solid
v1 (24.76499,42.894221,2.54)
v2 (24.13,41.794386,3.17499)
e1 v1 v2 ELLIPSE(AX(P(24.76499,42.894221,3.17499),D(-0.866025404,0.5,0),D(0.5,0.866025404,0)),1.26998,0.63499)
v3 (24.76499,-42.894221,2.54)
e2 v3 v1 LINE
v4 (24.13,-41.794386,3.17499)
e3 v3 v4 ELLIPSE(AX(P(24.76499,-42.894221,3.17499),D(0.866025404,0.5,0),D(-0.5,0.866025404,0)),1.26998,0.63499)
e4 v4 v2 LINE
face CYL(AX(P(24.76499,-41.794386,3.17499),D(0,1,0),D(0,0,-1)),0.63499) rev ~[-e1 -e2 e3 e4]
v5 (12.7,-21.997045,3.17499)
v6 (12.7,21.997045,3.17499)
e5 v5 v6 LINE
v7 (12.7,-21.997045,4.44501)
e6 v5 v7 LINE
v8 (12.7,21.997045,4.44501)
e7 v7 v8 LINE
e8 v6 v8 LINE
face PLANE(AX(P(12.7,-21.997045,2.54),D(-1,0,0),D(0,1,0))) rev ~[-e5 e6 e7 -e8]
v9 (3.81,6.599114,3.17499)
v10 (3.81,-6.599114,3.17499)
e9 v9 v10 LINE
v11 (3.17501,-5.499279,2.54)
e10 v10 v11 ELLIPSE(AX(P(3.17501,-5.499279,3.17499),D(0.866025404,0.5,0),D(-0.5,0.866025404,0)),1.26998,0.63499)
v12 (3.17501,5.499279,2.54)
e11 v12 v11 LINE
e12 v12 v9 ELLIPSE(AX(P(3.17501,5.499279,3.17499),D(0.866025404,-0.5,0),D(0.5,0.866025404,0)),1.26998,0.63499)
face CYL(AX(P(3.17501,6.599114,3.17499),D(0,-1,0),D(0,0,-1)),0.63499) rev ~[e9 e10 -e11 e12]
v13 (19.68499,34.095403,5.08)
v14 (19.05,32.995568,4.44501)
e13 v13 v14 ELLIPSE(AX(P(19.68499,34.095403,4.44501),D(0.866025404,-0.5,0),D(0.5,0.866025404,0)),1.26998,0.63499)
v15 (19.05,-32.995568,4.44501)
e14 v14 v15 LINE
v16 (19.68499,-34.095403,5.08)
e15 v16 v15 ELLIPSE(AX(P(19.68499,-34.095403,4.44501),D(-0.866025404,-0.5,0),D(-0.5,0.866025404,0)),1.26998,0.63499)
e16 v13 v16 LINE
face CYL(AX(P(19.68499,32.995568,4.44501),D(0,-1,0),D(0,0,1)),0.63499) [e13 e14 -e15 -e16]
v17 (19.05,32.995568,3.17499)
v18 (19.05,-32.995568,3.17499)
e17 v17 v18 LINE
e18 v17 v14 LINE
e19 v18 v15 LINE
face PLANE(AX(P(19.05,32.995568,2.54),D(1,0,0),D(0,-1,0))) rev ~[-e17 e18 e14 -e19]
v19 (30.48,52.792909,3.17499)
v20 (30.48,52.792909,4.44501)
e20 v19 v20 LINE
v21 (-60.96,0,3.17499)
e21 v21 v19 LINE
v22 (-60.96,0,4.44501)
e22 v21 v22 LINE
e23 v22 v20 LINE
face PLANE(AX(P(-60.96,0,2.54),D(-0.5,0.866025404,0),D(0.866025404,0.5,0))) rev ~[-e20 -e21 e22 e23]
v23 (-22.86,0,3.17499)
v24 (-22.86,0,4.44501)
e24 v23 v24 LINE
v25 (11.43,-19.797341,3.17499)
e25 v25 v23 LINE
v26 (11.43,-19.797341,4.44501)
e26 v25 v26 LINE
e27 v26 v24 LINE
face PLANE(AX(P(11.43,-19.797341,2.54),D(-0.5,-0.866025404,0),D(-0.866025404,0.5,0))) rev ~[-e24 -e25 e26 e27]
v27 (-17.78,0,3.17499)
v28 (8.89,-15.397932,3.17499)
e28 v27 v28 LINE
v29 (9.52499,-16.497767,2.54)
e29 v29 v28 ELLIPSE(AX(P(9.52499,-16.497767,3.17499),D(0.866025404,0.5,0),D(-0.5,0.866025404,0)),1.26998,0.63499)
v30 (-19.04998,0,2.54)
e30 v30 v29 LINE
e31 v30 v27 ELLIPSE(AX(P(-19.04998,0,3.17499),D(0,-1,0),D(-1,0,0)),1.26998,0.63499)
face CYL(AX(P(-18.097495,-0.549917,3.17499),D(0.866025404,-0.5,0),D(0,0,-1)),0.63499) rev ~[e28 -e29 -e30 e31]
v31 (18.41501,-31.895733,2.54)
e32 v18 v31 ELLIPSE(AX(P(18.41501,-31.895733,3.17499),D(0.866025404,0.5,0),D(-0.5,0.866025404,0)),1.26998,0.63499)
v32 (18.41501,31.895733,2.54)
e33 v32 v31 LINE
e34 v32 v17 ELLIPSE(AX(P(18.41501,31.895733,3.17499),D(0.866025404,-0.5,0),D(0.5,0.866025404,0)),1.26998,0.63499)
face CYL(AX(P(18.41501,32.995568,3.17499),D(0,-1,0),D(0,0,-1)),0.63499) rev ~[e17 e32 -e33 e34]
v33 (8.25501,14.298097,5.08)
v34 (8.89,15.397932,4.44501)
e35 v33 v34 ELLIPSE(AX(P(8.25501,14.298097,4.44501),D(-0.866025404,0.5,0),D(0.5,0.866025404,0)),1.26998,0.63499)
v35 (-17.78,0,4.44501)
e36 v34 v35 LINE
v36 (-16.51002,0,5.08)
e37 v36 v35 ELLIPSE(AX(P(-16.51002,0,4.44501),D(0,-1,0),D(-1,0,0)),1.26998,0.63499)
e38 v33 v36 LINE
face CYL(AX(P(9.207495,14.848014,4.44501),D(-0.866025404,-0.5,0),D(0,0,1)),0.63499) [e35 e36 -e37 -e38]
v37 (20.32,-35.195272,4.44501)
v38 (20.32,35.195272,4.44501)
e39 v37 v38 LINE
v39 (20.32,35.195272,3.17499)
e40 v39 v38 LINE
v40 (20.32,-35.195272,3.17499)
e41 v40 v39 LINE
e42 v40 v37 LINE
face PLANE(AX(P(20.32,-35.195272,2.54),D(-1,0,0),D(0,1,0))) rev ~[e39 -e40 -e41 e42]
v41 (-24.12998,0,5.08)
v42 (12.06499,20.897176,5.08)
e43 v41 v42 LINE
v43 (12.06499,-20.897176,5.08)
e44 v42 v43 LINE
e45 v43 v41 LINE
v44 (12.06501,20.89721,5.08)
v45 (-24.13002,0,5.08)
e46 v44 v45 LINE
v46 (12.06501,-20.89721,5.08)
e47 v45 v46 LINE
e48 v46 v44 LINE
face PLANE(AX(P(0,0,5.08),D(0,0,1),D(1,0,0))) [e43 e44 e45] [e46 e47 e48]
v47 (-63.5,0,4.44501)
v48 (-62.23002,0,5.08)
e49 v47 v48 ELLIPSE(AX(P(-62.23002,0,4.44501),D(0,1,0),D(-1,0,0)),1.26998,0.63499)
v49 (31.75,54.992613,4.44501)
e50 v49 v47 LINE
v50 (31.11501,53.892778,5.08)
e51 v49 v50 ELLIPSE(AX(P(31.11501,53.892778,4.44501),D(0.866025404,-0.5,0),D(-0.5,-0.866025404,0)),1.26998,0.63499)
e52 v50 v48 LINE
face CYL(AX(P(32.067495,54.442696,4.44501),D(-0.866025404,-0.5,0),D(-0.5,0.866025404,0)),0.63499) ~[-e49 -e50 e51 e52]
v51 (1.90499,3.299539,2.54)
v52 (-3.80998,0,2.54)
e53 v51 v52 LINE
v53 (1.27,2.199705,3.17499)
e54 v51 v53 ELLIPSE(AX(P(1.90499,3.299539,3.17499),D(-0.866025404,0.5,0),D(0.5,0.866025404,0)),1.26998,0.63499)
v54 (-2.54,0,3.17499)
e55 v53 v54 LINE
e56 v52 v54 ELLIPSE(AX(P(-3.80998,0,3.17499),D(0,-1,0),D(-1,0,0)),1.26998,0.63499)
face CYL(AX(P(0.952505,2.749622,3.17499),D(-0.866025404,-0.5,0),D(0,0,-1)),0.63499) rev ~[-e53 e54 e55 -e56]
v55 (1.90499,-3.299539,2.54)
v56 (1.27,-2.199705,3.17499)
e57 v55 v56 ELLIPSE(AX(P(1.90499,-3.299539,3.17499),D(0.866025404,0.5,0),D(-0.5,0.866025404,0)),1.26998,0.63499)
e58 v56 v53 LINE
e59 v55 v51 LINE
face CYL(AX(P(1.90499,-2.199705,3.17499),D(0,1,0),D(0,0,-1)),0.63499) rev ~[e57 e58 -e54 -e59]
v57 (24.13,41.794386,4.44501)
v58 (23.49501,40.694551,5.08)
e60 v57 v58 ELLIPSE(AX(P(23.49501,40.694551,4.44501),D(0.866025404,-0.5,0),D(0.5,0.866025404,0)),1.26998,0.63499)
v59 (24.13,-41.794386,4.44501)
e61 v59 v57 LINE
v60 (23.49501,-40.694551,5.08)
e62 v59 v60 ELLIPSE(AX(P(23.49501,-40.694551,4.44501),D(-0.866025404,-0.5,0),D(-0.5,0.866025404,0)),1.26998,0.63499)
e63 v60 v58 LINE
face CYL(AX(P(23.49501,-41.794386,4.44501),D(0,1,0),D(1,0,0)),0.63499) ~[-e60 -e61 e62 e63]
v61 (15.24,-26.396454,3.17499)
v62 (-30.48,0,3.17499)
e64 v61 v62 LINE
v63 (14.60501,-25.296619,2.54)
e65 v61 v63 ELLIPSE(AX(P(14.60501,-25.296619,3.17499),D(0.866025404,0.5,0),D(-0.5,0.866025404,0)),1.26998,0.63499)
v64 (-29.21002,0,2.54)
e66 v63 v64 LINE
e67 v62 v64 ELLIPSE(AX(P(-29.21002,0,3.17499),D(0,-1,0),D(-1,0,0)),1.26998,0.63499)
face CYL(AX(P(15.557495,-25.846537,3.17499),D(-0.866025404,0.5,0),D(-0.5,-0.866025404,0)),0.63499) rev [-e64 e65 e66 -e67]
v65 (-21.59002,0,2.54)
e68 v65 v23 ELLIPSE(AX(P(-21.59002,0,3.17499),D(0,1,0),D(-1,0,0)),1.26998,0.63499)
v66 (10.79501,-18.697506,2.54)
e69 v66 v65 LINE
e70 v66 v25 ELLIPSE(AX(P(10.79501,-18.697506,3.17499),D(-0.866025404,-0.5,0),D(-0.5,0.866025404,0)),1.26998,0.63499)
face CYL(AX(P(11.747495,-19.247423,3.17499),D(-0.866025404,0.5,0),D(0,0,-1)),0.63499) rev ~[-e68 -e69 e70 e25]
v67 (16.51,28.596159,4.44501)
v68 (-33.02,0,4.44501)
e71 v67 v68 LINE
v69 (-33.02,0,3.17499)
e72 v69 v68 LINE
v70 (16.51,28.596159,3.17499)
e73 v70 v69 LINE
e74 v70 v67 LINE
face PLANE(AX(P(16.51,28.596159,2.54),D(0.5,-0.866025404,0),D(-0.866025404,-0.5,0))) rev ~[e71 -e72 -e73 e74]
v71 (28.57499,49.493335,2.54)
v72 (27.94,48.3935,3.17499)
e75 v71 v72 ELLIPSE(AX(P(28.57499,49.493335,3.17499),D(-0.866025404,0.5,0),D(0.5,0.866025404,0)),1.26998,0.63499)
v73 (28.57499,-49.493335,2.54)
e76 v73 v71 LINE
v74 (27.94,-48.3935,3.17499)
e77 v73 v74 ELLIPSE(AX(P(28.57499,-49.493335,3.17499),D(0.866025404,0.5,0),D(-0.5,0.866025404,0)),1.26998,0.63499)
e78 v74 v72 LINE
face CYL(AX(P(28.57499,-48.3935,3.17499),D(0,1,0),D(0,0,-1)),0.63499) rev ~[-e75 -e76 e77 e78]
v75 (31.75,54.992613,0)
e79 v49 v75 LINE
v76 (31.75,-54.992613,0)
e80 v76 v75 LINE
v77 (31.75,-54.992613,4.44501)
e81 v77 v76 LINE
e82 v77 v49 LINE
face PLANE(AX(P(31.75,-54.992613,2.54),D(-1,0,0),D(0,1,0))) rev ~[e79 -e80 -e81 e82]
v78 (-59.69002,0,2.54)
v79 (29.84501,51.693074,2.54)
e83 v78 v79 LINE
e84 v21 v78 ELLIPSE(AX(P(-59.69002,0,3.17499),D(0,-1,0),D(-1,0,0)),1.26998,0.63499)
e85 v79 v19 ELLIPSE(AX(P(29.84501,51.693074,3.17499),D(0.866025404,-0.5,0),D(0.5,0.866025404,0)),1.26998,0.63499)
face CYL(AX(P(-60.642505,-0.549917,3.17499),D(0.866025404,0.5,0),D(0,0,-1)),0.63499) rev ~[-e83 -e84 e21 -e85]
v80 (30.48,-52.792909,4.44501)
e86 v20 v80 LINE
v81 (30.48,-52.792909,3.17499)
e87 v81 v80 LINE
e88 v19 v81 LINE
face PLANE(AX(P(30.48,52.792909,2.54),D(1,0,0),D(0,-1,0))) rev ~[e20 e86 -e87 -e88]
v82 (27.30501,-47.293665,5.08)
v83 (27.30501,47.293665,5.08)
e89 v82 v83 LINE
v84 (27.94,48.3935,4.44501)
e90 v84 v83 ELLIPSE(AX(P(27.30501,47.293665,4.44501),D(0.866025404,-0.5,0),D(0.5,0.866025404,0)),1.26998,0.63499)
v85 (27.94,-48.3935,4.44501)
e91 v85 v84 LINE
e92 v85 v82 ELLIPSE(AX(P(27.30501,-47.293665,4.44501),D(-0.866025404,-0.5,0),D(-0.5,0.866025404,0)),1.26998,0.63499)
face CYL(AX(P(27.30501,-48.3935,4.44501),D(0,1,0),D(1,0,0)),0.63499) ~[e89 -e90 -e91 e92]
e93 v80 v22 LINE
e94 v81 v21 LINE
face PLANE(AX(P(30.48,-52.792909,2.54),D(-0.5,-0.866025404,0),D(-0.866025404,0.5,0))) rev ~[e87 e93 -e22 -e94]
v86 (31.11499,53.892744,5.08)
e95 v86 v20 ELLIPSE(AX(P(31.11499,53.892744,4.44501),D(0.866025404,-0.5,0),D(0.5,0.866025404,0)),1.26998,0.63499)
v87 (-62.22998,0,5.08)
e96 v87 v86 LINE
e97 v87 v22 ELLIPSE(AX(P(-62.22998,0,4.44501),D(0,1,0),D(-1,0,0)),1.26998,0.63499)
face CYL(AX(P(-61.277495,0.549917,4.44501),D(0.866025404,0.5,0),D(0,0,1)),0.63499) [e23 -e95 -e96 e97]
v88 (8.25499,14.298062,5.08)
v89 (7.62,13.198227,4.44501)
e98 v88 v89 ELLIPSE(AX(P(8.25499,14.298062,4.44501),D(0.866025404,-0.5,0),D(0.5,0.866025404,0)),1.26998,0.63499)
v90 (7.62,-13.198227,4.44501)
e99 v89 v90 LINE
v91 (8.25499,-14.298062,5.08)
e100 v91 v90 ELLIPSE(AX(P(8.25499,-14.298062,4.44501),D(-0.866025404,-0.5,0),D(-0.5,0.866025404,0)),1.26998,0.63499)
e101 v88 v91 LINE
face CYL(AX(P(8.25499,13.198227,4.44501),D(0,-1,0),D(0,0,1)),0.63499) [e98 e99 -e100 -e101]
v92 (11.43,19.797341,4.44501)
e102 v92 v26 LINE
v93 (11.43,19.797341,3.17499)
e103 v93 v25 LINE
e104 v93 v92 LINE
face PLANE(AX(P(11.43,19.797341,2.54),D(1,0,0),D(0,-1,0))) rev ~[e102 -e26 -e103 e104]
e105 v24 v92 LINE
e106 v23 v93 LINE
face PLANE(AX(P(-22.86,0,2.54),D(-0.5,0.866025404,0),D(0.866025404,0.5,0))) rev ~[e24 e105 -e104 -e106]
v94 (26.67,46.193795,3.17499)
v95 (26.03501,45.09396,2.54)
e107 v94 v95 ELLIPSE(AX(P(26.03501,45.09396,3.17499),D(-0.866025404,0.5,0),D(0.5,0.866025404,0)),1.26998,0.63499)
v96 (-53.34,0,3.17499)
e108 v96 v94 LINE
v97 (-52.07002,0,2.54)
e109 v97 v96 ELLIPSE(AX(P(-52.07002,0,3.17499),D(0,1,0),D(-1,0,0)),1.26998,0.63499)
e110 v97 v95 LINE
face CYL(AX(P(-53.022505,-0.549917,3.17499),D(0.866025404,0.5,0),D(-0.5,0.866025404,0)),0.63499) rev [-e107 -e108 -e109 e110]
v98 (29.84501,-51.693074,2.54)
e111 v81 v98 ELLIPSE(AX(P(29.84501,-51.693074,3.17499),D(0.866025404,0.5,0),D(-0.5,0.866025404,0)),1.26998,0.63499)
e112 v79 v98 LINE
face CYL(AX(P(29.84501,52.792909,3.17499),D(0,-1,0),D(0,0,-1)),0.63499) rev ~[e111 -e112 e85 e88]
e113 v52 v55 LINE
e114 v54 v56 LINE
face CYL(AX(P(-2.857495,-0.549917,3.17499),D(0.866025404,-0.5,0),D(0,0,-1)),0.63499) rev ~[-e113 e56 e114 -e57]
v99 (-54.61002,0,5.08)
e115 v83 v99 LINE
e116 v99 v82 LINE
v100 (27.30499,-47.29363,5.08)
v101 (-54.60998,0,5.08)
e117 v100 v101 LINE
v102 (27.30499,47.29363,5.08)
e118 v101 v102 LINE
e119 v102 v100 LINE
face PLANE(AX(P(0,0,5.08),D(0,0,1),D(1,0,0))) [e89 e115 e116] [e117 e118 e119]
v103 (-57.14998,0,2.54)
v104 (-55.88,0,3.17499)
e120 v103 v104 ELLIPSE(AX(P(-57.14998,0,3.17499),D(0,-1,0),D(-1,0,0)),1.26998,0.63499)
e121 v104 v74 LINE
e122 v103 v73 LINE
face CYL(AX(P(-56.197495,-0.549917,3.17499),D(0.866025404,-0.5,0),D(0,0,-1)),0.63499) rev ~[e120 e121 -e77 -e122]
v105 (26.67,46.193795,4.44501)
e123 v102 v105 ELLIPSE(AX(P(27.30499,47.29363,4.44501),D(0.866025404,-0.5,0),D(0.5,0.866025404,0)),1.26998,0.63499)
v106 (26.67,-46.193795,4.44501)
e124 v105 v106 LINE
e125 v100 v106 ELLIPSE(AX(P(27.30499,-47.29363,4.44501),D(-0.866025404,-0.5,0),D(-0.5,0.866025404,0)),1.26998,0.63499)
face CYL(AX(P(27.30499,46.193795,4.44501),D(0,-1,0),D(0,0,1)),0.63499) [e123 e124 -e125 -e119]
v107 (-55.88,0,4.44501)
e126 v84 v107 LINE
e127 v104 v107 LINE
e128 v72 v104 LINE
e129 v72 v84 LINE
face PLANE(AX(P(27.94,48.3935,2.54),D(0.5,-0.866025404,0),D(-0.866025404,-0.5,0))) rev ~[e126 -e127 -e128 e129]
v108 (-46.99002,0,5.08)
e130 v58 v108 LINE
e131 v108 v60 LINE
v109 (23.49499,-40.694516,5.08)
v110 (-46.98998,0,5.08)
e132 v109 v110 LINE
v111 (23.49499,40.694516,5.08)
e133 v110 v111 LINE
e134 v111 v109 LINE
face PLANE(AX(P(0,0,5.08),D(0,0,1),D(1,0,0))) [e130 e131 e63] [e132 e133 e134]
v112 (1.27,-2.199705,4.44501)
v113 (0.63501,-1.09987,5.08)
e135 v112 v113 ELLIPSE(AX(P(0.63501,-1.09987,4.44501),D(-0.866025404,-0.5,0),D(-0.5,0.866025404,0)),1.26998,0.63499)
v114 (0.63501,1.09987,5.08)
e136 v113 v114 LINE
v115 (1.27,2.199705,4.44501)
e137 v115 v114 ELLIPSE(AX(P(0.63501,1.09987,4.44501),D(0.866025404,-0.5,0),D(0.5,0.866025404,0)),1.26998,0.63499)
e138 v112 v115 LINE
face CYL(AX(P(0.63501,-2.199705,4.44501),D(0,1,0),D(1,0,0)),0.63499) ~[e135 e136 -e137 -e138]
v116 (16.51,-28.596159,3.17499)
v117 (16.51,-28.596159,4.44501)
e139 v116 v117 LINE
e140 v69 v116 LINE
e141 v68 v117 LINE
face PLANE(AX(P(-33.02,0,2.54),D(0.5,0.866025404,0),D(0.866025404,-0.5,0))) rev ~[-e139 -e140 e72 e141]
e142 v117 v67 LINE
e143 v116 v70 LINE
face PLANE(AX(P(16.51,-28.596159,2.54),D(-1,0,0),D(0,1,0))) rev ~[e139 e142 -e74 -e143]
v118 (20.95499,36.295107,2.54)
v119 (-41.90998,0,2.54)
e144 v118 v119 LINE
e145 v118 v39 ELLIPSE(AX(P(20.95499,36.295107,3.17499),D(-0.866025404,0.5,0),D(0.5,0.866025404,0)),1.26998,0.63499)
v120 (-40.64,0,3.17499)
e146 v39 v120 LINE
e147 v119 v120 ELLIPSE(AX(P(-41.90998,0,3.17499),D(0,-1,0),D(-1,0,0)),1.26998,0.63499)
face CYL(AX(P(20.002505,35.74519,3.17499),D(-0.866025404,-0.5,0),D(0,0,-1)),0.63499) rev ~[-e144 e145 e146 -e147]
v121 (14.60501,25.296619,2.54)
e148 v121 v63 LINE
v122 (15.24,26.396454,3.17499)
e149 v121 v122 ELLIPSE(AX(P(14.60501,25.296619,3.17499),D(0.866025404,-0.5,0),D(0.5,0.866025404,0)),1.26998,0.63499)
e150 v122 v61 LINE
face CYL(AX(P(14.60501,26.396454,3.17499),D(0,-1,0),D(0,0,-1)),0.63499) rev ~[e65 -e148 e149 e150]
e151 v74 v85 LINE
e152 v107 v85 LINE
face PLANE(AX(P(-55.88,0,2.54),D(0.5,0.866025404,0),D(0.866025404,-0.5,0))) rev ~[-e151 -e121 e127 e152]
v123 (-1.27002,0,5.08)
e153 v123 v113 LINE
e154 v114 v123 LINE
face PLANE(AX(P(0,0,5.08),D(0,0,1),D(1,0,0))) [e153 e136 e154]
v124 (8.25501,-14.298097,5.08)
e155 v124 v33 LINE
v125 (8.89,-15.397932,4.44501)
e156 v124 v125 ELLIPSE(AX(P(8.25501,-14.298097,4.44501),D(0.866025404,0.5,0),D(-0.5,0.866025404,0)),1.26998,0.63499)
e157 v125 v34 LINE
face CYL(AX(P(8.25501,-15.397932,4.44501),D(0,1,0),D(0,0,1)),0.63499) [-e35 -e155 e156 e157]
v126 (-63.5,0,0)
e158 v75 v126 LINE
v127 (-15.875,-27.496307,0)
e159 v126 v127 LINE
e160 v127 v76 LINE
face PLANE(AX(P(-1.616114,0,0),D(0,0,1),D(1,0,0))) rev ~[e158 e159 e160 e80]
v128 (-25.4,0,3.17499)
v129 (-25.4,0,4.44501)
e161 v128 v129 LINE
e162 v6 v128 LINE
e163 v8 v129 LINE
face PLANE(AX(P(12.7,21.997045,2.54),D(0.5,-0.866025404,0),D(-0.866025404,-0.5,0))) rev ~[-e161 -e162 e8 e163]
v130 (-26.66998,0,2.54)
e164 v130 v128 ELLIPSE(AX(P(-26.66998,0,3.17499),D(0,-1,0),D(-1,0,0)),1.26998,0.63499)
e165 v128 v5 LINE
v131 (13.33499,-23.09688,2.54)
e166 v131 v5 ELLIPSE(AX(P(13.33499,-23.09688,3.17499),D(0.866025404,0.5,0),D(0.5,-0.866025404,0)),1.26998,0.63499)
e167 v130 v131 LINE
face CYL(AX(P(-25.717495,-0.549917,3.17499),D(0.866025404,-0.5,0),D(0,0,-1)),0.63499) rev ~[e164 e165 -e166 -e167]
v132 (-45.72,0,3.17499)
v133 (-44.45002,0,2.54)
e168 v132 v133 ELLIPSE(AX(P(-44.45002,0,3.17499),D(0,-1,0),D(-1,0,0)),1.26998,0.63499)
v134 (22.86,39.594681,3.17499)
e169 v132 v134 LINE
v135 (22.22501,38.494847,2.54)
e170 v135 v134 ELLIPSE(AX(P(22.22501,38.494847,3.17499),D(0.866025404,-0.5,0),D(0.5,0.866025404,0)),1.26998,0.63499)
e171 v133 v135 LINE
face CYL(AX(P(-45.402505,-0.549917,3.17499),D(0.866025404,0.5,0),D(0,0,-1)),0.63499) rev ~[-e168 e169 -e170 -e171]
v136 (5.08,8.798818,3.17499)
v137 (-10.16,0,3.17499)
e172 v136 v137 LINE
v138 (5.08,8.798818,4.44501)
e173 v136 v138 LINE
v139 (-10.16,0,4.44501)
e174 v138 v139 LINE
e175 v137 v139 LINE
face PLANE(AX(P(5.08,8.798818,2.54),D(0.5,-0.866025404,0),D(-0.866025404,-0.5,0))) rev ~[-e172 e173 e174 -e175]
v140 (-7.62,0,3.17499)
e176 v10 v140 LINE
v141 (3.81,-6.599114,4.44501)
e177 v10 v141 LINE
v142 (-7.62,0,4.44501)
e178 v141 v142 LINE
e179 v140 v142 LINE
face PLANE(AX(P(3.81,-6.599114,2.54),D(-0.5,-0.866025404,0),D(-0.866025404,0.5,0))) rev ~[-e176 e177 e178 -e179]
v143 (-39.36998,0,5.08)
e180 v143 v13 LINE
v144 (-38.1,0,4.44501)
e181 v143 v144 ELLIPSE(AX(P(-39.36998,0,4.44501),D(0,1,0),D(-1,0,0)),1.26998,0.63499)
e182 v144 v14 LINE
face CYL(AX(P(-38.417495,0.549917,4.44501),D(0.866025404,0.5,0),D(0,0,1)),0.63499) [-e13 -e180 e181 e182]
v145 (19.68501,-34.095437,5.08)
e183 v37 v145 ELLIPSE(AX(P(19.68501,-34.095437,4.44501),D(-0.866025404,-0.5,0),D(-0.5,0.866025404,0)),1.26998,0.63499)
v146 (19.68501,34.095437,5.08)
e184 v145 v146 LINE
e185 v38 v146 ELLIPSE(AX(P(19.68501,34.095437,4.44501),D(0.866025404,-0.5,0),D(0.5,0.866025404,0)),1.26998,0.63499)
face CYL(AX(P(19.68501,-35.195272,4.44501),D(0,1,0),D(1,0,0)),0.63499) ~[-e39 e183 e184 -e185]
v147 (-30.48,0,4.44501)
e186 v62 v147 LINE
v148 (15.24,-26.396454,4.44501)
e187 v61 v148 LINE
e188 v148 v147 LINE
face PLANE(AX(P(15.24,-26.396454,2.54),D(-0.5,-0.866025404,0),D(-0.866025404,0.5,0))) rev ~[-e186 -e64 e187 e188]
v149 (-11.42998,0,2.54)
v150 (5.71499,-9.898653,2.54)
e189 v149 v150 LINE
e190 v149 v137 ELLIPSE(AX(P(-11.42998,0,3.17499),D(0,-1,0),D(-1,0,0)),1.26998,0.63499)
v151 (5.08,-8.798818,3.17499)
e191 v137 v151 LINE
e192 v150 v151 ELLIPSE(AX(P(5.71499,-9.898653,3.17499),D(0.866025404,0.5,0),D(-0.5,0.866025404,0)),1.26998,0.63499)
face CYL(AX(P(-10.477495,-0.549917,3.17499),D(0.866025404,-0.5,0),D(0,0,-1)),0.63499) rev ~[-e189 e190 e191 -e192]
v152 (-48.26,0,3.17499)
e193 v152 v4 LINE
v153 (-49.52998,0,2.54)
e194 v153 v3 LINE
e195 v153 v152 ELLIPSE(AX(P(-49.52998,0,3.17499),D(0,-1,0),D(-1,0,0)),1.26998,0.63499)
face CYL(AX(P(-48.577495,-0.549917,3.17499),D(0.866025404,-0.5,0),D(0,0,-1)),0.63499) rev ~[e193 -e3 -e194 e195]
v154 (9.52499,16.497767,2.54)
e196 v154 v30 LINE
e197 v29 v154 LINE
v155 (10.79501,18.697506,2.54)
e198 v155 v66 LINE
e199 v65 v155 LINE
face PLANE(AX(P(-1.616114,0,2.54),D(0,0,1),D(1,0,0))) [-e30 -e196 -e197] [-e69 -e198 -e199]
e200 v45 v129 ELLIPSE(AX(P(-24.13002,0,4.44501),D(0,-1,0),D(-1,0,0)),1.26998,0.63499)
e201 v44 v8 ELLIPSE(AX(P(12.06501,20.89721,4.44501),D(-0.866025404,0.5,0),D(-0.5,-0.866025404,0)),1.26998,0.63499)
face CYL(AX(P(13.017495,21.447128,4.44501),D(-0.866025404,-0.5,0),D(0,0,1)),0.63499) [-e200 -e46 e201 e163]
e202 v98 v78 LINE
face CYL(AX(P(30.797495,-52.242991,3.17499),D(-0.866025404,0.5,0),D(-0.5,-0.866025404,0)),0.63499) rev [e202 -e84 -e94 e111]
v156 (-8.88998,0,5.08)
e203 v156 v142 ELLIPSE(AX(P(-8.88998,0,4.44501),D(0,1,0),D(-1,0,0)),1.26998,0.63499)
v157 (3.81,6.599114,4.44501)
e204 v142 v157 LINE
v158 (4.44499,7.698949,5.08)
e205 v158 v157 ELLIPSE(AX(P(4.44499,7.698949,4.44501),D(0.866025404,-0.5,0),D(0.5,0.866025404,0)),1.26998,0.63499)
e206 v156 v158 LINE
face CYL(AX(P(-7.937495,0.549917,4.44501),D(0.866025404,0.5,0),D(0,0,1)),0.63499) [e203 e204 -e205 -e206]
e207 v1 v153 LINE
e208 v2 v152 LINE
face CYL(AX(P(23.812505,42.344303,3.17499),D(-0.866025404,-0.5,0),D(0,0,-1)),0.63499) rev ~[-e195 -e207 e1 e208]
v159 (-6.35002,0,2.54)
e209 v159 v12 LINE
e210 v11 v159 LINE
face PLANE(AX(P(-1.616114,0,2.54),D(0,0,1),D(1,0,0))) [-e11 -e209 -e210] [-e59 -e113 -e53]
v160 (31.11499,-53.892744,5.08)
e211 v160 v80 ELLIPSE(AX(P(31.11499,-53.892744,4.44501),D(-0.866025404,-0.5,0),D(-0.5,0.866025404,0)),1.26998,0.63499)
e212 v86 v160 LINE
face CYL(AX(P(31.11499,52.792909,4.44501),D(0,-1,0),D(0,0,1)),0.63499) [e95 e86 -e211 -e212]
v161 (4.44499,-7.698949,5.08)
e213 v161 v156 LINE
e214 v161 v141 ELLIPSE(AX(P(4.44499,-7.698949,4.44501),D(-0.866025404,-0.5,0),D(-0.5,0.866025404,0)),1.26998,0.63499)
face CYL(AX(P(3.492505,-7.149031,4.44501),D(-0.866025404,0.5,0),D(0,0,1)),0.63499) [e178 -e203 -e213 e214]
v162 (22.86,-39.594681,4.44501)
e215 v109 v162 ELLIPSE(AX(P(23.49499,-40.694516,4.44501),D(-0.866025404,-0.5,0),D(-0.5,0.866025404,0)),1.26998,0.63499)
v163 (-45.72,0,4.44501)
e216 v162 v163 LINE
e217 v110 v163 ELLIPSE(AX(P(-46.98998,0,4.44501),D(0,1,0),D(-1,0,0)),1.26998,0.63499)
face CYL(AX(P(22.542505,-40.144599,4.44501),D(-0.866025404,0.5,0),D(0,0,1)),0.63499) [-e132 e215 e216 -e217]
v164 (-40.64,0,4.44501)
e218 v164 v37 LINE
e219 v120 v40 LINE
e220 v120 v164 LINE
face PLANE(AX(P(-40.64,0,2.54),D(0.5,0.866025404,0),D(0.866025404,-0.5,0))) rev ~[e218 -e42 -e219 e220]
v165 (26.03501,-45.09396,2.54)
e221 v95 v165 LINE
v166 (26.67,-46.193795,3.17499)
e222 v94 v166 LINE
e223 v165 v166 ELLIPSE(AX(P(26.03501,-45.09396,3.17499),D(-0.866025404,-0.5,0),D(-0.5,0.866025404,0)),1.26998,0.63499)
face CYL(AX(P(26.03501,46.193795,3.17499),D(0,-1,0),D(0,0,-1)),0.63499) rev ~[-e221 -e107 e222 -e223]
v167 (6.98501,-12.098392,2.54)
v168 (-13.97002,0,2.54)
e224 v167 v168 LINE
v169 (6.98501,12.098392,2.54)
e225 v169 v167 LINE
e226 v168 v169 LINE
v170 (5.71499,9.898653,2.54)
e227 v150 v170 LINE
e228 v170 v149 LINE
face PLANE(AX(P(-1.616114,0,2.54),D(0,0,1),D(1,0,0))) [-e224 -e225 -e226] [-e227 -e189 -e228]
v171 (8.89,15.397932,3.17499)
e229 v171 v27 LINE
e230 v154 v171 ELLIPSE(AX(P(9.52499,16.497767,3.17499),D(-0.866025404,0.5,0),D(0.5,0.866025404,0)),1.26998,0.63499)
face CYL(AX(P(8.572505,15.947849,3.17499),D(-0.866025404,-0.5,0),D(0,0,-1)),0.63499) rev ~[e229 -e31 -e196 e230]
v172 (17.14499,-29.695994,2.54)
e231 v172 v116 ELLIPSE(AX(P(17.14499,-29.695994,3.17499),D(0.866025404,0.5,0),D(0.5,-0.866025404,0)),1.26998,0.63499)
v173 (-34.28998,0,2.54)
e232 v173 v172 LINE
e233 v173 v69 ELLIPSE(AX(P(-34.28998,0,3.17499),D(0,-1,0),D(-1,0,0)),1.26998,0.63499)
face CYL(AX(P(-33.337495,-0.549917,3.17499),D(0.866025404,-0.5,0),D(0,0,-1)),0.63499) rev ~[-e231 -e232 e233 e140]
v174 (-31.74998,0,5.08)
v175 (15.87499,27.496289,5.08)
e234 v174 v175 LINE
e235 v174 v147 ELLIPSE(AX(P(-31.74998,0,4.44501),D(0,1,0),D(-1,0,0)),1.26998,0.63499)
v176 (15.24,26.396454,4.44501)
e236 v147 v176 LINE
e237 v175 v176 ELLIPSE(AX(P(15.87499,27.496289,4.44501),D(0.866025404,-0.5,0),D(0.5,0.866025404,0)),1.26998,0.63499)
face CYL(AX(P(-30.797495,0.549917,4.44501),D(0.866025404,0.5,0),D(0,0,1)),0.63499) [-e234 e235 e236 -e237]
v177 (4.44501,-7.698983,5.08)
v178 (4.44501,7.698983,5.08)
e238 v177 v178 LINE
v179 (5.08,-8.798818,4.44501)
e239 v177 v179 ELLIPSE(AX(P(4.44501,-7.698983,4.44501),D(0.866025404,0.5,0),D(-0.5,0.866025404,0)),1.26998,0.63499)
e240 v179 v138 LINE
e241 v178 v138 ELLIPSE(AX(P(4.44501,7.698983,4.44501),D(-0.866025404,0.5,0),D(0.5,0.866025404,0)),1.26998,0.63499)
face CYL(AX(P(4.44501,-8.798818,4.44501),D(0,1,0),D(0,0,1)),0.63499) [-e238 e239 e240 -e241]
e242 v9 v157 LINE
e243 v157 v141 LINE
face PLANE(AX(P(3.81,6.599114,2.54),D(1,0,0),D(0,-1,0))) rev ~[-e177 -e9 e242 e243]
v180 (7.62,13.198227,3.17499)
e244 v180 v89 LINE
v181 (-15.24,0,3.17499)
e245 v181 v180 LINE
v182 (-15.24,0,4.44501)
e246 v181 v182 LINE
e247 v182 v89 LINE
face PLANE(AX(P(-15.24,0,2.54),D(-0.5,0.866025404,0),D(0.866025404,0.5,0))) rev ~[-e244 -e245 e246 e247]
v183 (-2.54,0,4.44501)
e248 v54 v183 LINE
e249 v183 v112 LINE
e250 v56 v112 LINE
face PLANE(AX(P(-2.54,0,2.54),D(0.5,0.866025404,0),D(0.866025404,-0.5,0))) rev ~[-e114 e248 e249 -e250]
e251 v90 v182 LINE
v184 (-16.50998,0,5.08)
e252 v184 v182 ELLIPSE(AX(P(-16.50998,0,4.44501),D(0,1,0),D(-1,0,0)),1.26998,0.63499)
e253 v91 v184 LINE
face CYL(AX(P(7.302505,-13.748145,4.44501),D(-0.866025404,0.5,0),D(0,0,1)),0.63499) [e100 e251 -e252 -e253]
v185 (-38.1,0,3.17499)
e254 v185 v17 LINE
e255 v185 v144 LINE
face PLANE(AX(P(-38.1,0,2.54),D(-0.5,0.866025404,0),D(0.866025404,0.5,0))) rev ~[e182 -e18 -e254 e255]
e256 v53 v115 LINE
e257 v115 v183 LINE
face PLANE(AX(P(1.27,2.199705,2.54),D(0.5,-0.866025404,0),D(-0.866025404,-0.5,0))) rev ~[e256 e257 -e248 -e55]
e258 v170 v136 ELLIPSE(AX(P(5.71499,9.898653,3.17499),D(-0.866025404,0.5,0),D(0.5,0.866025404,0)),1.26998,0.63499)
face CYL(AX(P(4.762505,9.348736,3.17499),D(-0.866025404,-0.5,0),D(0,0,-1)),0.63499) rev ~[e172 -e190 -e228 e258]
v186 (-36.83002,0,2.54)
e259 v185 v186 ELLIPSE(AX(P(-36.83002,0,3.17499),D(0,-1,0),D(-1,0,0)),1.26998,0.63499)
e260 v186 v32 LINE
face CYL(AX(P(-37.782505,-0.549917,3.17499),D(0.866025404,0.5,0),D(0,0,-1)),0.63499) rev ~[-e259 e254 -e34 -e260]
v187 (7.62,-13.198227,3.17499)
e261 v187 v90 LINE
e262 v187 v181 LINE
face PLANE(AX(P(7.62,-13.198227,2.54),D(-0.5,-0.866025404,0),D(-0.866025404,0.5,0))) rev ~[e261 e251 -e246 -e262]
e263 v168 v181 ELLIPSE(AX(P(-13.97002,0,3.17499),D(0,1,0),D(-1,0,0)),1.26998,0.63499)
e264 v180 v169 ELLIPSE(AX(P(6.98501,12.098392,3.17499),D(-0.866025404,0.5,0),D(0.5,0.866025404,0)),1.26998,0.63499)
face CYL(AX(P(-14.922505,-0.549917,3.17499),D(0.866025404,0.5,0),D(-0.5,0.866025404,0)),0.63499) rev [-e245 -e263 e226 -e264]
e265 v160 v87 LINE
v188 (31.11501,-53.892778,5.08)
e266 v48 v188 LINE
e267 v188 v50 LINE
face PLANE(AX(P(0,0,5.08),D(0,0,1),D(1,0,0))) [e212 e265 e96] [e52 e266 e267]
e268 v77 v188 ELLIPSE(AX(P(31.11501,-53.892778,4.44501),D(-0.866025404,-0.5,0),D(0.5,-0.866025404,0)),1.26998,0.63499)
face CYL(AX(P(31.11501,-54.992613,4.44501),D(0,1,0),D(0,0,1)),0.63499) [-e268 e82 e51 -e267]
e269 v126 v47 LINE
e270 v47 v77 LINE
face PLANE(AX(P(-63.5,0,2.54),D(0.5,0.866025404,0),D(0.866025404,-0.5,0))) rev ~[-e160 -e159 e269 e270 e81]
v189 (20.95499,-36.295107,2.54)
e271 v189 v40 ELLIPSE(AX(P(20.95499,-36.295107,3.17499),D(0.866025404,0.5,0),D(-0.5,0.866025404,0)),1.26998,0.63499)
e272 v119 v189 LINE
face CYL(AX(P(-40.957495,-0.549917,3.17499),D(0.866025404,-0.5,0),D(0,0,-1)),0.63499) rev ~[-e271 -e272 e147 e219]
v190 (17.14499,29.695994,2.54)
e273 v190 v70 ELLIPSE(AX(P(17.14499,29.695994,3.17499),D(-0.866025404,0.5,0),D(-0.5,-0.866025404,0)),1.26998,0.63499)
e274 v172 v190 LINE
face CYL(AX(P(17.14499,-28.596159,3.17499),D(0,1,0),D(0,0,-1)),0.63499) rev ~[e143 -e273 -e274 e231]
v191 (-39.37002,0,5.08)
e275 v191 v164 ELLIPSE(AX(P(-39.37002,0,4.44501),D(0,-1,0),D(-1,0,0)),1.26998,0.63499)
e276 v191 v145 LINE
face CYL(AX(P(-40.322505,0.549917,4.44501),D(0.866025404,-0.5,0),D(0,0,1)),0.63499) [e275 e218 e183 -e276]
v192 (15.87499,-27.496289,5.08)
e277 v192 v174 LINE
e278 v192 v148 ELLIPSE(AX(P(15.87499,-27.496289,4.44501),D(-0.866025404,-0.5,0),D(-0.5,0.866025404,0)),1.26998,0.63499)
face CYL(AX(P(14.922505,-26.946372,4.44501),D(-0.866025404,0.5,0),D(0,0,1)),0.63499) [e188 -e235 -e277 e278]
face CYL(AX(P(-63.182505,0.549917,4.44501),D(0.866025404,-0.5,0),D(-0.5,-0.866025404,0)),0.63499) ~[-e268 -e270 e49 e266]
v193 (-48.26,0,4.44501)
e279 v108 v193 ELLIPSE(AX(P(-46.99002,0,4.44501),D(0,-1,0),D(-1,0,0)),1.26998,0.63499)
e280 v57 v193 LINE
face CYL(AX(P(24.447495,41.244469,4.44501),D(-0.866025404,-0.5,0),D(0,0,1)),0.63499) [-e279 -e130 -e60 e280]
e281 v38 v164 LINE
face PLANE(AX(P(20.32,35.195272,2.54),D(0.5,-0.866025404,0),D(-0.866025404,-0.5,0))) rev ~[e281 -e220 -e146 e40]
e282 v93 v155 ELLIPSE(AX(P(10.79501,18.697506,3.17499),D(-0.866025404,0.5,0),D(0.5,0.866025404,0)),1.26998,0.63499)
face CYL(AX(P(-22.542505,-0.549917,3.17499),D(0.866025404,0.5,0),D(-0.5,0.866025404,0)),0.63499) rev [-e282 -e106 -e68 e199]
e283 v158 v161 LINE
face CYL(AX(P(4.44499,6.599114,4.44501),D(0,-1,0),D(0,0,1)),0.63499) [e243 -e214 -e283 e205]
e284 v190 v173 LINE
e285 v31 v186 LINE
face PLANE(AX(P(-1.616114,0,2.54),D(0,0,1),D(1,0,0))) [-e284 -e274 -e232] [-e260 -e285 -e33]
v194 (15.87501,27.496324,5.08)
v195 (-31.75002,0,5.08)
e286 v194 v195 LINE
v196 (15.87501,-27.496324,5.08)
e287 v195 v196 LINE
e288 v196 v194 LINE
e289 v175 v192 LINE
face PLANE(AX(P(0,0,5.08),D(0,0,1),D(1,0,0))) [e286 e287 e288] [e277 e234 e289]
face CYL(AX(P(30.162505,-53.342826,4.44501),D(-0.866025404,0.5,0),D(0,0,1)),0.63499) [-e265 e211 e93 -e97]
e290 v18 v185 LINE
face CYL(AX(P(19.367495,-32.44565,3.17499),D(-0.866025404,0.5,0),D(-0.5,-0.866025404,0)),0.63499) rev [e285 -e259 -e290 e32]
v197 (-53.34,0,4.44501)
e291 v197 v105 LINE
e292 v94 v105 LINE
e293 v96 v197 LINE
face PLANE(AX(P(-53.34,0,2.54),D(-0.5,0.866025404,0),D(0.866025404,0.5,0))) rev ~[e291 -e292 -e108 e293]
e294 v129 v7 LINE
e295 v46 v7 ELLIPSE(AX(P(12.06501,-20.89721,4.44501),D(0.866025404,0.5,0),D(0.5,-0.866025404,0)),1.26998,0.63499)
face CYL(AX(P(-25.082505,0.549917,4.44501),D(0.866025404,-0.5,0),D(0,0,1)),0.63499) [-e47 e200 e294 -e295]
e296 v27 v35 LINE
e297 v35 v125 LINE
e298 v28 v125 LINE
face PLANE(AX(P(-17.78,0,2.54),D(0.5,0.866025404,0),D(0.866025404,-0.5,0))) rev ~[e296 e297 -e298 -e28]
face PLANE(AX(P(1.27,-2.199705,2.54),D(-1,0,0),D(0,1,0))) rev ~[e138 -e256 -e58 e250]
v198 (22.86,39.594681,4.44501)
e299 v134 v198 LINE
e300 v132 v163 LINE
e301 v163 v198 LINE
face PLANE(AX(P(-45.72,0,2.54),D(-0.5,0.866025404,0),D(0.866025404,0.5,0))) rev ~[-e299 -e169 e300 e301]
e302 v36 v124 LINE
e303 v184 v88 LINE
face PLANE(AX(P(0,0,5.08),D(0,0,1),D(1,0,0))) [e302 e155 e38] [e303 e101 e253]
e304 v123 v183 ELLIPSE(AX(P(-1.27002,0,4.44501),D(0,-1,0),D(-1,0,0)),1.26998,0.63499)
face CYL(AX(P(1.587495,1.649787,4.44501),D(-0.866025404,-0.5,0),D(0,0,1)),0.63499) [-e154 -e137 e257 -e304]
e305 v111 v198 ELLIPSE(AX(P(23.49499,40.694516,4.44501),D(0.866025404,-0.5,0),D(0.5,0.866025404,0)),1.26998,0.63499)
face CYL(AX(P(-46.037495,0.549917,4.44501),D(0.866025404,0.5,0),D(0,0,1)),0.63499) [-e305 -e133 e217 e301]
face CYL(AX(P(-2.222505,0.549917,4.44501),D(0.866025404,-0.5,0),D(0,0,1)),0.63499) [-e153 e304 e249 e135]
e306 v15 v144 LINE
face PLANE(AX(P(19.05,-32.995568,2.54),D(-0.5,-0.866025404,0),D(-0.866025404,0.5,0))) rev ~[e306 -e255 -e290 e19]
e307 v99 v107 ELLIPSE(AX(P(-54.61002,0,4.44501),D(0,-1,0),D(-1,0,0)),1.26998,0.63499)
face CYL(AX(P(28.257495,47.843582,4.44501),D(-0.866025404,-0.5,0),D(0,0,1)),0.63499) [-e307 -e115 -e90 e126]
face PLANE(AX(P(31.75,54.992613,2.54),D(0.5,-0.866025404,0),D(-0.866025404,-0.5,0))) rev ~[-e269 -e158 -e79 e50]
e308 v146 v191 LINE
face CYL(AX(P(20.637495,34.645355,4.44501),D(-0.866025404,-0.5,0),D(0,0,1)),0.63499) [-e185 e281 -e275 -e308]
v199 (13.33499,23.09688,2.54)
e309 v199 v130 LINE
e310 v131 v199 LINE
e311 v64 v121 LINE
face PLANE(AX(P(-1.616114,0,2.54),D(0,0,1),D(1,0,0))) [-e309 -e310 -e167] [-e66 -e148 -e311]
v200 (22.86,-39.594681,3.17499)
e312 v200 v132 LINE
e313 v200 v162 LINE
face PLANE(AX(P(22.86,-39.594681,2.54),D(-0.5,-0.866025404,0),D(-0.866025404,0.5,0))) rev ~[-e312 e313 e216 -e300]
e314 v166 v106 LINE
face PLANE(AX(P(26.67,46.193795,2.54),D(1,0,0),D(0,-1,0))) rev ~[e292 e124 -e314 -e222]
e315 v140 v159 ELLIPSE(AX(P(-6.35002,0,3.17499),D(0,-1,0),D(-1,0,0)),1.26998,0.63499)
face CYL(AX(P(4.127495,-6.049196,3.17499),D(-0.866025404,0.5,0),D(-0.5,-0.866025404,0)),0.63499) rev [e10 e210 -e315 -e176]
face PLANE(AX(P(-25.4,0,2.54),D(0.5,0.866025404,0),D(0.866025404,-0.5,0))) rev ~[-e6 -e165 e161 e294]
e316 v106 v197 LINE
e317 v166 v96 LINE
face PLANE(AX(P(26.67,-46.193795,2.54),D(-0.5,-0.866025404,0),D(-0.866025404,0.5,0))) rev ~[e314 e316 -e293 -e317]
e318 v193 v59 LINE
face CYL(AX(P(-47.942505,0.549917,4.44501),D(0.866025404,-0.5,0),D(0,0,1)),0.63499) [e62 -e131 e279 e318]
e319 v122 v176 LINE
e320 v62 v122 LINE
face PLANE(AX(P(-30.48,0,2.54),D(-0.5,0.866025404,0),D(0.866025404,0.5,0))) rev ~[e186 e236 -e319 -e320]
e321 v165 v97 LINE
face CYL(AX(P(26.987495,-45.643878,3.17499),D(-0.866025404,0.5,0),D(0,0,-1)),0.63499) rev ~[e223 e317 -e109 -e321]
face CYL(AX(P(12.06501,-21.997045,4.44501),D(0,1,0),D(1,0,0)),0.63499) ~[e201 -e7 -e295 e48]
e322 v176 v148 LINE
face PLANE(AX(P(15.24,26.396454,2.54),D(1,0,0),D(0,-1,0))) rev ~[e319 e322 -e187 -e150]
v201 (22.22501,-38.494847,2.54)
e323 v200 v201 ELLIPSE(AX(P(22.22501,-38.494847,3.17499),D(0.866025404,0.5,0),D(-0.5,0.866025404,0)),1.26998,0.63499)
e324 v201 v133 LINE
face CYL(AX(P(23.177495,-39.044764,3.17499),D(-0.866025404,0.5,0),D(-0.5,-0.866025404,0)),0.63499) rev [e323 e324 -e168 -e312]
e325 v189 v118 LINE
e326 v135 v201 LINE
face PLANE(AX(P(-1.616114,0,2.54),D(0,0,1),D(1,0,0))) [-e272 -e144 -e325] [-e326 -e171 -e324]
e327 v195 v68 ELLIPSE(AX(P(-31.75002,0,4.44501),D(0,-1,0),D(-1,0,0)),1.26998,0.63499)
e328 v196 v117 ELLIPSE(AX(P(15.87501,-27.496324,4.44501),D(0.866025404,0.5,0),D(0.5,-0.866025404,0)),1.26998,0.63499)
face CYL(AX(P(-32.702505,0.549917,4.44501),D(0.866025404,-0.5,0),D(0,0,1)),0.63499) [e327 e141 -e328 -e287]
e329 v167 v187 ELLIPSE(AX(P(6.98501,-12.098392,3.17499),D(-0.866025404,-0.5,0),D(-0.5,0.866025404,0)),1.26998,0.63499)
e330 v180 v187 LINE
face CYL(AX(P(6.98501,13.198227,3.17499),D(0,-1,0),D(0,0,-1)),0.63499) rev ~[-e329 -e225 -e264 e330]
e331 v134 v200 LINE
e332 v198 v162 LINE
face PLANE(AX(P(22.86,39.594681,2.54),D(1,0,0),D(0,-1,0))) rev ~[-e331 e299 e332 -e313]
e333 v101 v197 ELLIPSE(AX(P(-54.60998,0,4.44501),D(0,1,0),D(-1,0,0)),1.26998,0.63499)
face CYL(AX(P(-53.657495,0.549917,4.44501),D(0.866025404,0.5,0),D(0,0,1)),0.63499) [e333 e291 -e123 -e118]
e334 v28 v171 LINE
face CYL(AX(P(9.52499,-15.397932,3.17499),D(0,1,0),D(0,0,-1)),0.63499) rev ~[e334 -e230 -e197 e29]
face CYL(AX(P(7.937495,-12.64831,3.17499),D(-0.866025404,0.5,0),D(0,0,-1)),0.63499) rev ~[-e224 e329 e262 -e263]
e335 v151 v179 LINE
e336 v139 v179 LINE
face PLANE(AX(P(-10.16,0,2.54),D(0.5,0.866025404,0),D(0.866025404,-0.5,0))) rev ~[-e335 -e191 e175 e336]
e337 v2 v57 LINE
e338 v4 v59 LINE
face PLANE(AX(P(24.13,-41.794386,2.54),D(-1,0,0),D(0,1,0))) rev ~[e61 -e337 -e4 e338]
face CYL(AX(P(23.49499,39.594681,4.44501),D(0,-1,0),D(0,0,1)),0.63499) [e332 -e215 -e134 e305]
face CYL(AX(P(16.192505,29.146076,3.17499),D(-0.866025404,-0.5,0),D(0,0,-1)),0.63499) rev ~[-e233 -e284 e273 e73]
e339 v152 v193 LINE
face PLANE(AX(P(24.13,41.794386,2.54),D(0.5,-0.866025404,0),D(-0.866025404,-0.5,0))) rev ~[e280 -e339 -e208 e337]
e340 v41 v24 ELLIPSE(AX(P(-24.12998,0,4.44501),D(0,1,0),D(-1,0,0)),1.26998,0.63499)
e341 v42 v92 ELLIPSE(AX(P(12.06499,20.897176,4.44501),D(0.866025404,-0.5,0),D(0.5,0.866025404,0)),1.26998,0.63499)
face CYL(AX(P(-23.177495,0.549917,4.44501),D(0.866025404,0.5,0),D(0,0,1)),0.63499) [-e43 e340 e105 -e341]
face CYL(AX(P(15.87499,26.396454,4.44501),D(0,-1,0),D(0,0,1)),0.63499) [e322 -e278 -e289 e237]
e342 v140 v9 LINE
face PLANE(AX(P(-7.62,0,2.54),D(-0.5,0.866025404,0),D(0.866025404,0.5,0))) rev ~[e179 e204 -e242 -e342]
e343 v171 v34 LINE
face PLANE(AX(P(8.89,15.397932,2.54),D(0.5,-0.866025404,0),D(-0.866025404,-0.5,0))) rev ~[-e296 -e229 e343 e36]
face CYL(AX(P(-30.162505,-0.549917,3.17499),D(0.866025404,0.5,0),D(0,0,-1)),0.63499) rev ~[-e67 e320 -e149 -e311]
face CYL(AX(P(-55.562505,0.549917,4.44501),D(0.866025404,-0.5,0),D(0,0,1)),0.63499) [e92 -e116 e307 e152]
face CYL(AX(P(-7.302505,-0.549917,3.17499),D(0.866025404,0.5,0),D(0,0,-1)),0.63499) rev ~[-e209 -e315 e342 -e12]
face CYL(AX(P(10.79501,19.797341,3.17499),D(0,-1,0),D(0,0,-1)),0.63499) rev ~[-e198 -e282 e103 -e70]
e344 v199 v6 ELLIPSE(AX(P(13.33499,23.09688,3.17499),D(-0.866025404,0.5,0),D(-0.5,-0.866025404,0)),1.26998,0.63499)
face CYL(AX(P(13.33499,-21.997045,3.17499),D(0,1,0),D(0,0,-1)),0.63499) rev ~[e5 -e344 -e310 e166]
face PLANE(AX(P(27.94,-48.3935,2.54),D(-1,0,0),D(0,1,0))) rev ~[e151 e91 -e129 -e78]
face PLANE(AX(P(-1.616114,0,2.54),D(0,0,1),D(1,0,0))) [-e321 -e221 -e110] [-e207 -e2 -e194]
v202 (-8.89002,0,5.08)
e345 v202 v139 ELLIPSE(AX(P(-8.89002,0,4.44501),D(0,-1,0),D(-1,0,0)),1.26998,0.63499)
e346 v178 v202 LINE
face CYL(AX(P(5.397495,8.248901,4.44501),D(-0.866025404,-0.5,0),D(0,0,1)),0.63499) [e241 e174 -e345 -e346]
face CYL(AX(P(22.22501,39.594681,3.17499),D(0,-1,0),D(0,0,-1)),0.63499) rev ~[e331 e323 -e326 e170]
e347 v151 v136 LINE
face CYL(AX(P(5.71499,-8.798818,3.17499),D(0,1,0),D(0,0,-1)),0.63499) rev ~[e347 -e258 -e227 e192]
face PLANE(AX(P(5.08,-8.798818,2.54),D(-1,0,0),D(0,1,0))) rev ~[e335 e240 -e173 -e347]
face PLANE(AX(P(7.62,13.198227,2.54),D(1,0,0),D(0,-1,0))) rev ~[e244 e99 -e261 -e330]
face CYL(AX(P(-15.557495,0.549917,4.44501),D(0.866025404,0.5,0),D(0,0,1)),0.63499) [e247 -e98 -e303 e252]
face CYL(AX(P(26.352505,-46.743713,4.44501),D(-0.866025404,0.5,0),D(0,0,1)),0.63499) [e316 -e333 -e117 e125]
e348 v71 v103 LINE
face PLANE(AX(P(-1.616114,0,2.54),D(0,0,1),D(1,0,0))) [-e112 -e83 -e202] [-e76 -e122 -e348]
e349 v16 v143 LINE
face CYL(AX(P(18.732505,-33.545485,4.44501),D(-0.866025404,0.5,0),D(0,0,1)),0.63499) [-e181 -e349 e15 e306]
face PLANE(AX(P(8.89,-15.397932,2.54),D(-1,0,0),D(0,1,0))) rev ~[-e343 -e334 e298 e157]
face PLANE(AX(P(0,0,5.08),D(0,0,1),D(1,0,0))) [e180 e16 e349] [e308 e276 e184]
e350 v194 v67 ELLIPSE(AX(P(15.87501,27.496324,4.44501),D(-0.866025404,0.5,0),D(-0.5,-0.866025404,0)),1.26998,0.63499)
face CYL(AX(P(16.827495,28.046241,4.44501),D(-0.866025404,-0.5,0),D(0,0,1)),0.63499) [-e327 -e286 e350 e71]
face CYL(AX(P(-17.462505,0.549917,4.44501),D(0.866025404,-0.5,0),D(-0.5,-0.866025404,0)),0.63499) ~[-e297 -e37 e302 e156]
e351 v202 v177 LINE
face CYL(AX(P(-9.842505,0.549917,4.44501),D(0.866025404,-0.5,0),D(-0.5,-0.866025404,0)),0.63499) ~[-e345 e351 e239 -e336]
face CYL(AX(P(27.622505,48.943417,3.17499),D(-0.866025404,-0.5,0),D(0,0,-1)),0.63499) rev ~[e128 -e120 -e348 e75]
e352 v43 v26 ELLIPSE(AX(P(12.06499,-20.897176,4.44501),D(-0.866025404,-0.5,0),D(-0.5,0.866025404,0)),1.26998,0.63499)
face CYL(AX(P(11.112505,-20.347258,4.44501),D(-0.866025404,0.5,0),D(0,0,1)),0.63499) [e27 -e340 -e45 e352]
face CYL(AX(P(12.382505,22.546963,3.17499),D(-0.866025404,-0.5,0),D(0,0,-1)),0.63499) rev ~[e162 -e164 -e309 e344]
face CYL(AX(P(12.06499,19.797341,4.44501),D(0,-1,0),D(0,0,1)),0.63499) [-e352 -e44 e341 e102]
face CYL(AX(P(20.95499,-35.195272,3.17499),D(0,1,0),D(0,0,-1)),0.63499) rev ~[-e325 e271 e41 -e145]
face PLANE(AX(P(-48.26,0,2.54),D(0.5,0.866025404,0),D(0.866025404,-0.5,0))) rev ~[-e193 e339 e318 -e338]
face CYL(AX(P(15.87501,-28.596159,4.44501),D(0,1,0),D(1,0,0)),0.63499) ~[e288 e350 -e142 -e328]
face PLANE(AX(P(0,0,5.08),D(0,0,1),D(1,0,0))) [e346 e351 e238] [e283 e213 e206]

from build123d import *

# Parameters (mm, degrees)
F1_DEPTH = 2.54
F3_DEPTH = 2.54
F4_R     = 0.63499


# Not quite as in the source:
# - a fillet or chamfer is up to 0.001 mm smaller than in the source, because OpenCascade refuses the exact size


with BuildPart() as f1:
    # F0 (on Top) → F1 (new body)
    with BuildSketch(Plane.XY):
        with BuildLine():
            ThreePointArc((-15.8749996872, -27.4963067508), (15.8750001564, -27.4963064799), (31.75, 0))
            ThreePointArc((31.75, 0), (15.8749996133, 27.4963067934), (-15.8750007733, 27.4963061237))
            ThreePointArc((-15.8750007733, 27.4963061237), (-31.75, -6.271e-07), (-15.8749996872, -27.4963067508))
        make_face()
        with BuildLine():
            Line((31.75, -54.9926131403), (31.75, 0))
            ThreePointArc((31.75, 0), (15.8750001564, -27.4963064799), (-15.8749996872, -27.4963067508))
            Line((-15.8749996872, -27.4963067508), (31.75, -54.9926131403))
        make_face()
        with BuildLine():
            ThreePointArc((-15.8750007733, 27.4963061237), (15.8749996133, 27.4963067934), (31.75, 0))
            Line((31.75, 0), (31.75, 54.9926131403))
            Line((31.75, 54.9926131403), (-15.8750007733, 27.4963061237))
        make_face()
        with BuildLine():
            ThreePointArc((-15.8749996872, -27.4963067508), (-31.75, -6.271e-07), (-15.8750007733, 27.4963061237))
            Line((-15.8750007733, 27.4963061237), (-63.5, 0))
            Line((-63.5, 0), (-15.8749996872, -27.4963067508))
        make_face()
    extrude(amount=F1_DEPTH)

    # F2 (on face) → F3 (join)
    with BuildSketch(Plane.XY.offset(2.54)):
        Polygon((31.75, 54.9926131403), (-63.5, 0), (31.75, -54.9926131403), align=None)
        Polygon((30.48, -52.7929086147), (-60.96, 0), (30.48, 52.7929086147), align=None, mode=Mode.SUBTRACT)
        Polygon((27.94, 48.3934995635), (-55.88, 0), (27.94, -48.3934995635), align=None)
        Polygon((-53.34, 0), (26.67, 46.1937950379), (26.67, -46.1937950379), align=None, mode=Mode.SUBTRACT)
        Polygon((24.13, 41.7943859866), (-48.26, 0), (24.13, -41.7943859866), align=None)
        Polygon((22.86, -39.594681461), (-45.72, 0), (22.86, 39.594681461), align=None, mode=Mode.SUBTRACT)
        Polygon((20.32, 35.1952724098), (-40.64, 0), (20.32, -35.1952724098), align=None)
        Polygon((19.05, -32.9955678842), (-38.1, 0), (19.05, 32.9955678842), align=None, mode=Mode.SUBTRACT)
        Polygon((16.51, 28.596158833), (-33.02, 0), (16.51, -28.596158833), align=None)
        Polygon((15.24, -26.3964543073), (-30.48, 0), (15.24, 26.3964543073), align=None, mode=Mode.SUBTRACT)
        Polygon((12.7, 21.9970452561), (-25.4, 0), (12.7, -21.9970452561), align=None)
        Polygon((-22.86, 0), (11.43, 19.7973407305), (11.43, -19.7973407305), align=None, mode=Mode.SUBTRACT)
        Polygon((8.89, -15.3979316793), (8.89, 15.3979316793), (-17.78, 0), align=None)
        Polygon((-15.24, 0), (7.62, 13.1982271537), (7.62, -13.1982271537), align=None, mode=Mode.SUBTRACT)
        Polygon((5.08, -8.7988181024), (5.08, 8.7988181024), (-10.16, 0), align=None)
        Polygon((3.81, -6.5991135768), (-7.62, 0), (3.81, 6.5991135768), align=None, mode=Mode.SUBTRACT)
        Polygon((1.27, 2.1997045256), (-2.54, 0), (1.27, -2.1997045256), align=None)
    extrude(amount=F3_DEPTH)

    # F4 (radius 0.635 in the source; OpenCascade refuses exactly that, so slightly less here)
    f4_edges = [f1.edges().sort_by_distance(p)[0] for p in [
        (-15.875, 27.496307, 5.08),
        (-15.875, -27.496307, 5.08),
        (31.75, 0, 5.08),
        (-15.24, -26.396454, 5.08),
        (-15.24, 26.396454, 5.08),
        (30.48, 0, 5.08),
        (-15.24, -26.396454, 2.54),
        (-15.24, 26.396454, 2.54),
        (30.48, 0, 2.54),
        (27.94, 0, 2.54),
        (-13.97, 24.19675, 2.54),
        (-13.97, -24.19675, 2.54),
        (27.94, 0, 5.08),
        (-13.97, 24.19675, 5.08),
        (-13.97, -24.19675, 5.08),
        (-13.335, -23.096898, 5.08),
        (-13.335, 23.096898, 5.08),
        (26.67, 0, 5.08),
        (-13.335, -23.096898, 2.54),
        (-13.335, 23.096898, 2.54),
        (26.67, 0, 2.54),
        (24.13, 0, 2.54),
        (-12.065, 20.897193, 2.54),
        (-12.065, -20.897193, 2.54),
        (24.13, 0, 5.08),
        (-12.065, 20.897193, 5.08),
        (-12.065, -20.897193, 5.08),
        (-11.43, -19.797341, 5.08),
        (-11.43, 19.797341, 5.08),
        (22.86, 0, 5.08),
        (-11.43, -19.797341, 2.54),
        (-11.43, 19.797341, 2.54),
        (22.86, 0, 2.54),
        (20.32, 0, 2.54),
        (-10.16, 17.597636, 2.54),
        (-10.16, -17.597636, 2.54),
        (20.32, 0, 5.08),
        (-10.16, 17.597636, 5.08),
        (-10.16, -17.597636, 5.08),
        (-9.525, -16.497784, 5.08),
        (-9.525, 16.497784, 5.08),
        (19.05, 0, 5.08),
        (-9.525, -16.497784, 2.54),
        (-9.525, 16.497784, 2.54),
        (19.05, 0, 2.54),
        (-8.255, 14.298079, 2.54),
        (-8.255, -14.298079, 2.54),
        (16.51, 0, 2.54),
        (-8.255, 14.298079, 5.08),
        (-8.255, -14.298079, 5.08),
        (16.51, 0, 5.08),
        (-7.62, -13.198227, 5.08),
        (-7.62, 13.198227, 5.08),
        (15.24, 0, 5.08),
        (-7.62, -13.198227, 2.54),
        (-7.62, 13.198227, 2.54),
        (15.24, 0, 2.54),
        (-6.35, 10.998523, 2.54),
        (-6.35, -10.998523, 2.54),
        (12.7, 0, 2.54),
        (-6.35, 10.998523, 5.08),
        (-6.35, -10.998523, 5.08),
        (12.7, 0, 5.08),
        (-5.715, -9.89867, 5.08),
        (-5.715, 9.89867, 5.08),
        (11.43, 0, 5.08),
        (-5.715, -9.89867, 2.54),
        (-5.715, 9.89867, 2.54),
        (11.43, 0, 2.54),
        (8.89, 0, 2.54),
        (-4.445, 7.698966, 2.54),
        (-4.445, -7.698966, 2.54),
        (8.89, 0, 5.08),
        (-4.445, 7.698966, 5.08),
        (-4.445, -7.698966, 5.08),
        (-3.81, -6.599114, 5.08),
        (-3.81, 6.599114, 5.08),
        (7.62, 0, 5.08),
        (-3.81, -6.599114, 2.54),
        (-3.81, 6.599114, 2.54),
        (7.62, 0, 2.54),
        (5.08, 0, 2.54),
        (-2.54, 4.399409, 2.54),
        (-2.54, -4.399409, 2.54),
        (5.08, 0, 5.08),
        (-2.54, 4.399409, 5.08),
        (-2.54, -4.399409, 5.08),
        (-1.905, -3.299557, 5.08),
        (-1.905, 3.299557, 5.08),
        (3.81, 0, 5.08),
        (-1.905, -3.299557, 2.54),
        (-1.905, 3.299557, 2.54),
        (3.81, 0, 2.54),
        (1.27, 0, 2.54),
        (-0.635, 1.099852, 2.54),
        (-0.635, -1.099852, 2.54),
        (1.27, 0, 5.08),
        (-0.635, 1.099852, 5.08),
        (-0.635, -1.099852, 5.08),
    ]]
    fillet(f4_edges, radius=F4_R)


solid = f1.part
